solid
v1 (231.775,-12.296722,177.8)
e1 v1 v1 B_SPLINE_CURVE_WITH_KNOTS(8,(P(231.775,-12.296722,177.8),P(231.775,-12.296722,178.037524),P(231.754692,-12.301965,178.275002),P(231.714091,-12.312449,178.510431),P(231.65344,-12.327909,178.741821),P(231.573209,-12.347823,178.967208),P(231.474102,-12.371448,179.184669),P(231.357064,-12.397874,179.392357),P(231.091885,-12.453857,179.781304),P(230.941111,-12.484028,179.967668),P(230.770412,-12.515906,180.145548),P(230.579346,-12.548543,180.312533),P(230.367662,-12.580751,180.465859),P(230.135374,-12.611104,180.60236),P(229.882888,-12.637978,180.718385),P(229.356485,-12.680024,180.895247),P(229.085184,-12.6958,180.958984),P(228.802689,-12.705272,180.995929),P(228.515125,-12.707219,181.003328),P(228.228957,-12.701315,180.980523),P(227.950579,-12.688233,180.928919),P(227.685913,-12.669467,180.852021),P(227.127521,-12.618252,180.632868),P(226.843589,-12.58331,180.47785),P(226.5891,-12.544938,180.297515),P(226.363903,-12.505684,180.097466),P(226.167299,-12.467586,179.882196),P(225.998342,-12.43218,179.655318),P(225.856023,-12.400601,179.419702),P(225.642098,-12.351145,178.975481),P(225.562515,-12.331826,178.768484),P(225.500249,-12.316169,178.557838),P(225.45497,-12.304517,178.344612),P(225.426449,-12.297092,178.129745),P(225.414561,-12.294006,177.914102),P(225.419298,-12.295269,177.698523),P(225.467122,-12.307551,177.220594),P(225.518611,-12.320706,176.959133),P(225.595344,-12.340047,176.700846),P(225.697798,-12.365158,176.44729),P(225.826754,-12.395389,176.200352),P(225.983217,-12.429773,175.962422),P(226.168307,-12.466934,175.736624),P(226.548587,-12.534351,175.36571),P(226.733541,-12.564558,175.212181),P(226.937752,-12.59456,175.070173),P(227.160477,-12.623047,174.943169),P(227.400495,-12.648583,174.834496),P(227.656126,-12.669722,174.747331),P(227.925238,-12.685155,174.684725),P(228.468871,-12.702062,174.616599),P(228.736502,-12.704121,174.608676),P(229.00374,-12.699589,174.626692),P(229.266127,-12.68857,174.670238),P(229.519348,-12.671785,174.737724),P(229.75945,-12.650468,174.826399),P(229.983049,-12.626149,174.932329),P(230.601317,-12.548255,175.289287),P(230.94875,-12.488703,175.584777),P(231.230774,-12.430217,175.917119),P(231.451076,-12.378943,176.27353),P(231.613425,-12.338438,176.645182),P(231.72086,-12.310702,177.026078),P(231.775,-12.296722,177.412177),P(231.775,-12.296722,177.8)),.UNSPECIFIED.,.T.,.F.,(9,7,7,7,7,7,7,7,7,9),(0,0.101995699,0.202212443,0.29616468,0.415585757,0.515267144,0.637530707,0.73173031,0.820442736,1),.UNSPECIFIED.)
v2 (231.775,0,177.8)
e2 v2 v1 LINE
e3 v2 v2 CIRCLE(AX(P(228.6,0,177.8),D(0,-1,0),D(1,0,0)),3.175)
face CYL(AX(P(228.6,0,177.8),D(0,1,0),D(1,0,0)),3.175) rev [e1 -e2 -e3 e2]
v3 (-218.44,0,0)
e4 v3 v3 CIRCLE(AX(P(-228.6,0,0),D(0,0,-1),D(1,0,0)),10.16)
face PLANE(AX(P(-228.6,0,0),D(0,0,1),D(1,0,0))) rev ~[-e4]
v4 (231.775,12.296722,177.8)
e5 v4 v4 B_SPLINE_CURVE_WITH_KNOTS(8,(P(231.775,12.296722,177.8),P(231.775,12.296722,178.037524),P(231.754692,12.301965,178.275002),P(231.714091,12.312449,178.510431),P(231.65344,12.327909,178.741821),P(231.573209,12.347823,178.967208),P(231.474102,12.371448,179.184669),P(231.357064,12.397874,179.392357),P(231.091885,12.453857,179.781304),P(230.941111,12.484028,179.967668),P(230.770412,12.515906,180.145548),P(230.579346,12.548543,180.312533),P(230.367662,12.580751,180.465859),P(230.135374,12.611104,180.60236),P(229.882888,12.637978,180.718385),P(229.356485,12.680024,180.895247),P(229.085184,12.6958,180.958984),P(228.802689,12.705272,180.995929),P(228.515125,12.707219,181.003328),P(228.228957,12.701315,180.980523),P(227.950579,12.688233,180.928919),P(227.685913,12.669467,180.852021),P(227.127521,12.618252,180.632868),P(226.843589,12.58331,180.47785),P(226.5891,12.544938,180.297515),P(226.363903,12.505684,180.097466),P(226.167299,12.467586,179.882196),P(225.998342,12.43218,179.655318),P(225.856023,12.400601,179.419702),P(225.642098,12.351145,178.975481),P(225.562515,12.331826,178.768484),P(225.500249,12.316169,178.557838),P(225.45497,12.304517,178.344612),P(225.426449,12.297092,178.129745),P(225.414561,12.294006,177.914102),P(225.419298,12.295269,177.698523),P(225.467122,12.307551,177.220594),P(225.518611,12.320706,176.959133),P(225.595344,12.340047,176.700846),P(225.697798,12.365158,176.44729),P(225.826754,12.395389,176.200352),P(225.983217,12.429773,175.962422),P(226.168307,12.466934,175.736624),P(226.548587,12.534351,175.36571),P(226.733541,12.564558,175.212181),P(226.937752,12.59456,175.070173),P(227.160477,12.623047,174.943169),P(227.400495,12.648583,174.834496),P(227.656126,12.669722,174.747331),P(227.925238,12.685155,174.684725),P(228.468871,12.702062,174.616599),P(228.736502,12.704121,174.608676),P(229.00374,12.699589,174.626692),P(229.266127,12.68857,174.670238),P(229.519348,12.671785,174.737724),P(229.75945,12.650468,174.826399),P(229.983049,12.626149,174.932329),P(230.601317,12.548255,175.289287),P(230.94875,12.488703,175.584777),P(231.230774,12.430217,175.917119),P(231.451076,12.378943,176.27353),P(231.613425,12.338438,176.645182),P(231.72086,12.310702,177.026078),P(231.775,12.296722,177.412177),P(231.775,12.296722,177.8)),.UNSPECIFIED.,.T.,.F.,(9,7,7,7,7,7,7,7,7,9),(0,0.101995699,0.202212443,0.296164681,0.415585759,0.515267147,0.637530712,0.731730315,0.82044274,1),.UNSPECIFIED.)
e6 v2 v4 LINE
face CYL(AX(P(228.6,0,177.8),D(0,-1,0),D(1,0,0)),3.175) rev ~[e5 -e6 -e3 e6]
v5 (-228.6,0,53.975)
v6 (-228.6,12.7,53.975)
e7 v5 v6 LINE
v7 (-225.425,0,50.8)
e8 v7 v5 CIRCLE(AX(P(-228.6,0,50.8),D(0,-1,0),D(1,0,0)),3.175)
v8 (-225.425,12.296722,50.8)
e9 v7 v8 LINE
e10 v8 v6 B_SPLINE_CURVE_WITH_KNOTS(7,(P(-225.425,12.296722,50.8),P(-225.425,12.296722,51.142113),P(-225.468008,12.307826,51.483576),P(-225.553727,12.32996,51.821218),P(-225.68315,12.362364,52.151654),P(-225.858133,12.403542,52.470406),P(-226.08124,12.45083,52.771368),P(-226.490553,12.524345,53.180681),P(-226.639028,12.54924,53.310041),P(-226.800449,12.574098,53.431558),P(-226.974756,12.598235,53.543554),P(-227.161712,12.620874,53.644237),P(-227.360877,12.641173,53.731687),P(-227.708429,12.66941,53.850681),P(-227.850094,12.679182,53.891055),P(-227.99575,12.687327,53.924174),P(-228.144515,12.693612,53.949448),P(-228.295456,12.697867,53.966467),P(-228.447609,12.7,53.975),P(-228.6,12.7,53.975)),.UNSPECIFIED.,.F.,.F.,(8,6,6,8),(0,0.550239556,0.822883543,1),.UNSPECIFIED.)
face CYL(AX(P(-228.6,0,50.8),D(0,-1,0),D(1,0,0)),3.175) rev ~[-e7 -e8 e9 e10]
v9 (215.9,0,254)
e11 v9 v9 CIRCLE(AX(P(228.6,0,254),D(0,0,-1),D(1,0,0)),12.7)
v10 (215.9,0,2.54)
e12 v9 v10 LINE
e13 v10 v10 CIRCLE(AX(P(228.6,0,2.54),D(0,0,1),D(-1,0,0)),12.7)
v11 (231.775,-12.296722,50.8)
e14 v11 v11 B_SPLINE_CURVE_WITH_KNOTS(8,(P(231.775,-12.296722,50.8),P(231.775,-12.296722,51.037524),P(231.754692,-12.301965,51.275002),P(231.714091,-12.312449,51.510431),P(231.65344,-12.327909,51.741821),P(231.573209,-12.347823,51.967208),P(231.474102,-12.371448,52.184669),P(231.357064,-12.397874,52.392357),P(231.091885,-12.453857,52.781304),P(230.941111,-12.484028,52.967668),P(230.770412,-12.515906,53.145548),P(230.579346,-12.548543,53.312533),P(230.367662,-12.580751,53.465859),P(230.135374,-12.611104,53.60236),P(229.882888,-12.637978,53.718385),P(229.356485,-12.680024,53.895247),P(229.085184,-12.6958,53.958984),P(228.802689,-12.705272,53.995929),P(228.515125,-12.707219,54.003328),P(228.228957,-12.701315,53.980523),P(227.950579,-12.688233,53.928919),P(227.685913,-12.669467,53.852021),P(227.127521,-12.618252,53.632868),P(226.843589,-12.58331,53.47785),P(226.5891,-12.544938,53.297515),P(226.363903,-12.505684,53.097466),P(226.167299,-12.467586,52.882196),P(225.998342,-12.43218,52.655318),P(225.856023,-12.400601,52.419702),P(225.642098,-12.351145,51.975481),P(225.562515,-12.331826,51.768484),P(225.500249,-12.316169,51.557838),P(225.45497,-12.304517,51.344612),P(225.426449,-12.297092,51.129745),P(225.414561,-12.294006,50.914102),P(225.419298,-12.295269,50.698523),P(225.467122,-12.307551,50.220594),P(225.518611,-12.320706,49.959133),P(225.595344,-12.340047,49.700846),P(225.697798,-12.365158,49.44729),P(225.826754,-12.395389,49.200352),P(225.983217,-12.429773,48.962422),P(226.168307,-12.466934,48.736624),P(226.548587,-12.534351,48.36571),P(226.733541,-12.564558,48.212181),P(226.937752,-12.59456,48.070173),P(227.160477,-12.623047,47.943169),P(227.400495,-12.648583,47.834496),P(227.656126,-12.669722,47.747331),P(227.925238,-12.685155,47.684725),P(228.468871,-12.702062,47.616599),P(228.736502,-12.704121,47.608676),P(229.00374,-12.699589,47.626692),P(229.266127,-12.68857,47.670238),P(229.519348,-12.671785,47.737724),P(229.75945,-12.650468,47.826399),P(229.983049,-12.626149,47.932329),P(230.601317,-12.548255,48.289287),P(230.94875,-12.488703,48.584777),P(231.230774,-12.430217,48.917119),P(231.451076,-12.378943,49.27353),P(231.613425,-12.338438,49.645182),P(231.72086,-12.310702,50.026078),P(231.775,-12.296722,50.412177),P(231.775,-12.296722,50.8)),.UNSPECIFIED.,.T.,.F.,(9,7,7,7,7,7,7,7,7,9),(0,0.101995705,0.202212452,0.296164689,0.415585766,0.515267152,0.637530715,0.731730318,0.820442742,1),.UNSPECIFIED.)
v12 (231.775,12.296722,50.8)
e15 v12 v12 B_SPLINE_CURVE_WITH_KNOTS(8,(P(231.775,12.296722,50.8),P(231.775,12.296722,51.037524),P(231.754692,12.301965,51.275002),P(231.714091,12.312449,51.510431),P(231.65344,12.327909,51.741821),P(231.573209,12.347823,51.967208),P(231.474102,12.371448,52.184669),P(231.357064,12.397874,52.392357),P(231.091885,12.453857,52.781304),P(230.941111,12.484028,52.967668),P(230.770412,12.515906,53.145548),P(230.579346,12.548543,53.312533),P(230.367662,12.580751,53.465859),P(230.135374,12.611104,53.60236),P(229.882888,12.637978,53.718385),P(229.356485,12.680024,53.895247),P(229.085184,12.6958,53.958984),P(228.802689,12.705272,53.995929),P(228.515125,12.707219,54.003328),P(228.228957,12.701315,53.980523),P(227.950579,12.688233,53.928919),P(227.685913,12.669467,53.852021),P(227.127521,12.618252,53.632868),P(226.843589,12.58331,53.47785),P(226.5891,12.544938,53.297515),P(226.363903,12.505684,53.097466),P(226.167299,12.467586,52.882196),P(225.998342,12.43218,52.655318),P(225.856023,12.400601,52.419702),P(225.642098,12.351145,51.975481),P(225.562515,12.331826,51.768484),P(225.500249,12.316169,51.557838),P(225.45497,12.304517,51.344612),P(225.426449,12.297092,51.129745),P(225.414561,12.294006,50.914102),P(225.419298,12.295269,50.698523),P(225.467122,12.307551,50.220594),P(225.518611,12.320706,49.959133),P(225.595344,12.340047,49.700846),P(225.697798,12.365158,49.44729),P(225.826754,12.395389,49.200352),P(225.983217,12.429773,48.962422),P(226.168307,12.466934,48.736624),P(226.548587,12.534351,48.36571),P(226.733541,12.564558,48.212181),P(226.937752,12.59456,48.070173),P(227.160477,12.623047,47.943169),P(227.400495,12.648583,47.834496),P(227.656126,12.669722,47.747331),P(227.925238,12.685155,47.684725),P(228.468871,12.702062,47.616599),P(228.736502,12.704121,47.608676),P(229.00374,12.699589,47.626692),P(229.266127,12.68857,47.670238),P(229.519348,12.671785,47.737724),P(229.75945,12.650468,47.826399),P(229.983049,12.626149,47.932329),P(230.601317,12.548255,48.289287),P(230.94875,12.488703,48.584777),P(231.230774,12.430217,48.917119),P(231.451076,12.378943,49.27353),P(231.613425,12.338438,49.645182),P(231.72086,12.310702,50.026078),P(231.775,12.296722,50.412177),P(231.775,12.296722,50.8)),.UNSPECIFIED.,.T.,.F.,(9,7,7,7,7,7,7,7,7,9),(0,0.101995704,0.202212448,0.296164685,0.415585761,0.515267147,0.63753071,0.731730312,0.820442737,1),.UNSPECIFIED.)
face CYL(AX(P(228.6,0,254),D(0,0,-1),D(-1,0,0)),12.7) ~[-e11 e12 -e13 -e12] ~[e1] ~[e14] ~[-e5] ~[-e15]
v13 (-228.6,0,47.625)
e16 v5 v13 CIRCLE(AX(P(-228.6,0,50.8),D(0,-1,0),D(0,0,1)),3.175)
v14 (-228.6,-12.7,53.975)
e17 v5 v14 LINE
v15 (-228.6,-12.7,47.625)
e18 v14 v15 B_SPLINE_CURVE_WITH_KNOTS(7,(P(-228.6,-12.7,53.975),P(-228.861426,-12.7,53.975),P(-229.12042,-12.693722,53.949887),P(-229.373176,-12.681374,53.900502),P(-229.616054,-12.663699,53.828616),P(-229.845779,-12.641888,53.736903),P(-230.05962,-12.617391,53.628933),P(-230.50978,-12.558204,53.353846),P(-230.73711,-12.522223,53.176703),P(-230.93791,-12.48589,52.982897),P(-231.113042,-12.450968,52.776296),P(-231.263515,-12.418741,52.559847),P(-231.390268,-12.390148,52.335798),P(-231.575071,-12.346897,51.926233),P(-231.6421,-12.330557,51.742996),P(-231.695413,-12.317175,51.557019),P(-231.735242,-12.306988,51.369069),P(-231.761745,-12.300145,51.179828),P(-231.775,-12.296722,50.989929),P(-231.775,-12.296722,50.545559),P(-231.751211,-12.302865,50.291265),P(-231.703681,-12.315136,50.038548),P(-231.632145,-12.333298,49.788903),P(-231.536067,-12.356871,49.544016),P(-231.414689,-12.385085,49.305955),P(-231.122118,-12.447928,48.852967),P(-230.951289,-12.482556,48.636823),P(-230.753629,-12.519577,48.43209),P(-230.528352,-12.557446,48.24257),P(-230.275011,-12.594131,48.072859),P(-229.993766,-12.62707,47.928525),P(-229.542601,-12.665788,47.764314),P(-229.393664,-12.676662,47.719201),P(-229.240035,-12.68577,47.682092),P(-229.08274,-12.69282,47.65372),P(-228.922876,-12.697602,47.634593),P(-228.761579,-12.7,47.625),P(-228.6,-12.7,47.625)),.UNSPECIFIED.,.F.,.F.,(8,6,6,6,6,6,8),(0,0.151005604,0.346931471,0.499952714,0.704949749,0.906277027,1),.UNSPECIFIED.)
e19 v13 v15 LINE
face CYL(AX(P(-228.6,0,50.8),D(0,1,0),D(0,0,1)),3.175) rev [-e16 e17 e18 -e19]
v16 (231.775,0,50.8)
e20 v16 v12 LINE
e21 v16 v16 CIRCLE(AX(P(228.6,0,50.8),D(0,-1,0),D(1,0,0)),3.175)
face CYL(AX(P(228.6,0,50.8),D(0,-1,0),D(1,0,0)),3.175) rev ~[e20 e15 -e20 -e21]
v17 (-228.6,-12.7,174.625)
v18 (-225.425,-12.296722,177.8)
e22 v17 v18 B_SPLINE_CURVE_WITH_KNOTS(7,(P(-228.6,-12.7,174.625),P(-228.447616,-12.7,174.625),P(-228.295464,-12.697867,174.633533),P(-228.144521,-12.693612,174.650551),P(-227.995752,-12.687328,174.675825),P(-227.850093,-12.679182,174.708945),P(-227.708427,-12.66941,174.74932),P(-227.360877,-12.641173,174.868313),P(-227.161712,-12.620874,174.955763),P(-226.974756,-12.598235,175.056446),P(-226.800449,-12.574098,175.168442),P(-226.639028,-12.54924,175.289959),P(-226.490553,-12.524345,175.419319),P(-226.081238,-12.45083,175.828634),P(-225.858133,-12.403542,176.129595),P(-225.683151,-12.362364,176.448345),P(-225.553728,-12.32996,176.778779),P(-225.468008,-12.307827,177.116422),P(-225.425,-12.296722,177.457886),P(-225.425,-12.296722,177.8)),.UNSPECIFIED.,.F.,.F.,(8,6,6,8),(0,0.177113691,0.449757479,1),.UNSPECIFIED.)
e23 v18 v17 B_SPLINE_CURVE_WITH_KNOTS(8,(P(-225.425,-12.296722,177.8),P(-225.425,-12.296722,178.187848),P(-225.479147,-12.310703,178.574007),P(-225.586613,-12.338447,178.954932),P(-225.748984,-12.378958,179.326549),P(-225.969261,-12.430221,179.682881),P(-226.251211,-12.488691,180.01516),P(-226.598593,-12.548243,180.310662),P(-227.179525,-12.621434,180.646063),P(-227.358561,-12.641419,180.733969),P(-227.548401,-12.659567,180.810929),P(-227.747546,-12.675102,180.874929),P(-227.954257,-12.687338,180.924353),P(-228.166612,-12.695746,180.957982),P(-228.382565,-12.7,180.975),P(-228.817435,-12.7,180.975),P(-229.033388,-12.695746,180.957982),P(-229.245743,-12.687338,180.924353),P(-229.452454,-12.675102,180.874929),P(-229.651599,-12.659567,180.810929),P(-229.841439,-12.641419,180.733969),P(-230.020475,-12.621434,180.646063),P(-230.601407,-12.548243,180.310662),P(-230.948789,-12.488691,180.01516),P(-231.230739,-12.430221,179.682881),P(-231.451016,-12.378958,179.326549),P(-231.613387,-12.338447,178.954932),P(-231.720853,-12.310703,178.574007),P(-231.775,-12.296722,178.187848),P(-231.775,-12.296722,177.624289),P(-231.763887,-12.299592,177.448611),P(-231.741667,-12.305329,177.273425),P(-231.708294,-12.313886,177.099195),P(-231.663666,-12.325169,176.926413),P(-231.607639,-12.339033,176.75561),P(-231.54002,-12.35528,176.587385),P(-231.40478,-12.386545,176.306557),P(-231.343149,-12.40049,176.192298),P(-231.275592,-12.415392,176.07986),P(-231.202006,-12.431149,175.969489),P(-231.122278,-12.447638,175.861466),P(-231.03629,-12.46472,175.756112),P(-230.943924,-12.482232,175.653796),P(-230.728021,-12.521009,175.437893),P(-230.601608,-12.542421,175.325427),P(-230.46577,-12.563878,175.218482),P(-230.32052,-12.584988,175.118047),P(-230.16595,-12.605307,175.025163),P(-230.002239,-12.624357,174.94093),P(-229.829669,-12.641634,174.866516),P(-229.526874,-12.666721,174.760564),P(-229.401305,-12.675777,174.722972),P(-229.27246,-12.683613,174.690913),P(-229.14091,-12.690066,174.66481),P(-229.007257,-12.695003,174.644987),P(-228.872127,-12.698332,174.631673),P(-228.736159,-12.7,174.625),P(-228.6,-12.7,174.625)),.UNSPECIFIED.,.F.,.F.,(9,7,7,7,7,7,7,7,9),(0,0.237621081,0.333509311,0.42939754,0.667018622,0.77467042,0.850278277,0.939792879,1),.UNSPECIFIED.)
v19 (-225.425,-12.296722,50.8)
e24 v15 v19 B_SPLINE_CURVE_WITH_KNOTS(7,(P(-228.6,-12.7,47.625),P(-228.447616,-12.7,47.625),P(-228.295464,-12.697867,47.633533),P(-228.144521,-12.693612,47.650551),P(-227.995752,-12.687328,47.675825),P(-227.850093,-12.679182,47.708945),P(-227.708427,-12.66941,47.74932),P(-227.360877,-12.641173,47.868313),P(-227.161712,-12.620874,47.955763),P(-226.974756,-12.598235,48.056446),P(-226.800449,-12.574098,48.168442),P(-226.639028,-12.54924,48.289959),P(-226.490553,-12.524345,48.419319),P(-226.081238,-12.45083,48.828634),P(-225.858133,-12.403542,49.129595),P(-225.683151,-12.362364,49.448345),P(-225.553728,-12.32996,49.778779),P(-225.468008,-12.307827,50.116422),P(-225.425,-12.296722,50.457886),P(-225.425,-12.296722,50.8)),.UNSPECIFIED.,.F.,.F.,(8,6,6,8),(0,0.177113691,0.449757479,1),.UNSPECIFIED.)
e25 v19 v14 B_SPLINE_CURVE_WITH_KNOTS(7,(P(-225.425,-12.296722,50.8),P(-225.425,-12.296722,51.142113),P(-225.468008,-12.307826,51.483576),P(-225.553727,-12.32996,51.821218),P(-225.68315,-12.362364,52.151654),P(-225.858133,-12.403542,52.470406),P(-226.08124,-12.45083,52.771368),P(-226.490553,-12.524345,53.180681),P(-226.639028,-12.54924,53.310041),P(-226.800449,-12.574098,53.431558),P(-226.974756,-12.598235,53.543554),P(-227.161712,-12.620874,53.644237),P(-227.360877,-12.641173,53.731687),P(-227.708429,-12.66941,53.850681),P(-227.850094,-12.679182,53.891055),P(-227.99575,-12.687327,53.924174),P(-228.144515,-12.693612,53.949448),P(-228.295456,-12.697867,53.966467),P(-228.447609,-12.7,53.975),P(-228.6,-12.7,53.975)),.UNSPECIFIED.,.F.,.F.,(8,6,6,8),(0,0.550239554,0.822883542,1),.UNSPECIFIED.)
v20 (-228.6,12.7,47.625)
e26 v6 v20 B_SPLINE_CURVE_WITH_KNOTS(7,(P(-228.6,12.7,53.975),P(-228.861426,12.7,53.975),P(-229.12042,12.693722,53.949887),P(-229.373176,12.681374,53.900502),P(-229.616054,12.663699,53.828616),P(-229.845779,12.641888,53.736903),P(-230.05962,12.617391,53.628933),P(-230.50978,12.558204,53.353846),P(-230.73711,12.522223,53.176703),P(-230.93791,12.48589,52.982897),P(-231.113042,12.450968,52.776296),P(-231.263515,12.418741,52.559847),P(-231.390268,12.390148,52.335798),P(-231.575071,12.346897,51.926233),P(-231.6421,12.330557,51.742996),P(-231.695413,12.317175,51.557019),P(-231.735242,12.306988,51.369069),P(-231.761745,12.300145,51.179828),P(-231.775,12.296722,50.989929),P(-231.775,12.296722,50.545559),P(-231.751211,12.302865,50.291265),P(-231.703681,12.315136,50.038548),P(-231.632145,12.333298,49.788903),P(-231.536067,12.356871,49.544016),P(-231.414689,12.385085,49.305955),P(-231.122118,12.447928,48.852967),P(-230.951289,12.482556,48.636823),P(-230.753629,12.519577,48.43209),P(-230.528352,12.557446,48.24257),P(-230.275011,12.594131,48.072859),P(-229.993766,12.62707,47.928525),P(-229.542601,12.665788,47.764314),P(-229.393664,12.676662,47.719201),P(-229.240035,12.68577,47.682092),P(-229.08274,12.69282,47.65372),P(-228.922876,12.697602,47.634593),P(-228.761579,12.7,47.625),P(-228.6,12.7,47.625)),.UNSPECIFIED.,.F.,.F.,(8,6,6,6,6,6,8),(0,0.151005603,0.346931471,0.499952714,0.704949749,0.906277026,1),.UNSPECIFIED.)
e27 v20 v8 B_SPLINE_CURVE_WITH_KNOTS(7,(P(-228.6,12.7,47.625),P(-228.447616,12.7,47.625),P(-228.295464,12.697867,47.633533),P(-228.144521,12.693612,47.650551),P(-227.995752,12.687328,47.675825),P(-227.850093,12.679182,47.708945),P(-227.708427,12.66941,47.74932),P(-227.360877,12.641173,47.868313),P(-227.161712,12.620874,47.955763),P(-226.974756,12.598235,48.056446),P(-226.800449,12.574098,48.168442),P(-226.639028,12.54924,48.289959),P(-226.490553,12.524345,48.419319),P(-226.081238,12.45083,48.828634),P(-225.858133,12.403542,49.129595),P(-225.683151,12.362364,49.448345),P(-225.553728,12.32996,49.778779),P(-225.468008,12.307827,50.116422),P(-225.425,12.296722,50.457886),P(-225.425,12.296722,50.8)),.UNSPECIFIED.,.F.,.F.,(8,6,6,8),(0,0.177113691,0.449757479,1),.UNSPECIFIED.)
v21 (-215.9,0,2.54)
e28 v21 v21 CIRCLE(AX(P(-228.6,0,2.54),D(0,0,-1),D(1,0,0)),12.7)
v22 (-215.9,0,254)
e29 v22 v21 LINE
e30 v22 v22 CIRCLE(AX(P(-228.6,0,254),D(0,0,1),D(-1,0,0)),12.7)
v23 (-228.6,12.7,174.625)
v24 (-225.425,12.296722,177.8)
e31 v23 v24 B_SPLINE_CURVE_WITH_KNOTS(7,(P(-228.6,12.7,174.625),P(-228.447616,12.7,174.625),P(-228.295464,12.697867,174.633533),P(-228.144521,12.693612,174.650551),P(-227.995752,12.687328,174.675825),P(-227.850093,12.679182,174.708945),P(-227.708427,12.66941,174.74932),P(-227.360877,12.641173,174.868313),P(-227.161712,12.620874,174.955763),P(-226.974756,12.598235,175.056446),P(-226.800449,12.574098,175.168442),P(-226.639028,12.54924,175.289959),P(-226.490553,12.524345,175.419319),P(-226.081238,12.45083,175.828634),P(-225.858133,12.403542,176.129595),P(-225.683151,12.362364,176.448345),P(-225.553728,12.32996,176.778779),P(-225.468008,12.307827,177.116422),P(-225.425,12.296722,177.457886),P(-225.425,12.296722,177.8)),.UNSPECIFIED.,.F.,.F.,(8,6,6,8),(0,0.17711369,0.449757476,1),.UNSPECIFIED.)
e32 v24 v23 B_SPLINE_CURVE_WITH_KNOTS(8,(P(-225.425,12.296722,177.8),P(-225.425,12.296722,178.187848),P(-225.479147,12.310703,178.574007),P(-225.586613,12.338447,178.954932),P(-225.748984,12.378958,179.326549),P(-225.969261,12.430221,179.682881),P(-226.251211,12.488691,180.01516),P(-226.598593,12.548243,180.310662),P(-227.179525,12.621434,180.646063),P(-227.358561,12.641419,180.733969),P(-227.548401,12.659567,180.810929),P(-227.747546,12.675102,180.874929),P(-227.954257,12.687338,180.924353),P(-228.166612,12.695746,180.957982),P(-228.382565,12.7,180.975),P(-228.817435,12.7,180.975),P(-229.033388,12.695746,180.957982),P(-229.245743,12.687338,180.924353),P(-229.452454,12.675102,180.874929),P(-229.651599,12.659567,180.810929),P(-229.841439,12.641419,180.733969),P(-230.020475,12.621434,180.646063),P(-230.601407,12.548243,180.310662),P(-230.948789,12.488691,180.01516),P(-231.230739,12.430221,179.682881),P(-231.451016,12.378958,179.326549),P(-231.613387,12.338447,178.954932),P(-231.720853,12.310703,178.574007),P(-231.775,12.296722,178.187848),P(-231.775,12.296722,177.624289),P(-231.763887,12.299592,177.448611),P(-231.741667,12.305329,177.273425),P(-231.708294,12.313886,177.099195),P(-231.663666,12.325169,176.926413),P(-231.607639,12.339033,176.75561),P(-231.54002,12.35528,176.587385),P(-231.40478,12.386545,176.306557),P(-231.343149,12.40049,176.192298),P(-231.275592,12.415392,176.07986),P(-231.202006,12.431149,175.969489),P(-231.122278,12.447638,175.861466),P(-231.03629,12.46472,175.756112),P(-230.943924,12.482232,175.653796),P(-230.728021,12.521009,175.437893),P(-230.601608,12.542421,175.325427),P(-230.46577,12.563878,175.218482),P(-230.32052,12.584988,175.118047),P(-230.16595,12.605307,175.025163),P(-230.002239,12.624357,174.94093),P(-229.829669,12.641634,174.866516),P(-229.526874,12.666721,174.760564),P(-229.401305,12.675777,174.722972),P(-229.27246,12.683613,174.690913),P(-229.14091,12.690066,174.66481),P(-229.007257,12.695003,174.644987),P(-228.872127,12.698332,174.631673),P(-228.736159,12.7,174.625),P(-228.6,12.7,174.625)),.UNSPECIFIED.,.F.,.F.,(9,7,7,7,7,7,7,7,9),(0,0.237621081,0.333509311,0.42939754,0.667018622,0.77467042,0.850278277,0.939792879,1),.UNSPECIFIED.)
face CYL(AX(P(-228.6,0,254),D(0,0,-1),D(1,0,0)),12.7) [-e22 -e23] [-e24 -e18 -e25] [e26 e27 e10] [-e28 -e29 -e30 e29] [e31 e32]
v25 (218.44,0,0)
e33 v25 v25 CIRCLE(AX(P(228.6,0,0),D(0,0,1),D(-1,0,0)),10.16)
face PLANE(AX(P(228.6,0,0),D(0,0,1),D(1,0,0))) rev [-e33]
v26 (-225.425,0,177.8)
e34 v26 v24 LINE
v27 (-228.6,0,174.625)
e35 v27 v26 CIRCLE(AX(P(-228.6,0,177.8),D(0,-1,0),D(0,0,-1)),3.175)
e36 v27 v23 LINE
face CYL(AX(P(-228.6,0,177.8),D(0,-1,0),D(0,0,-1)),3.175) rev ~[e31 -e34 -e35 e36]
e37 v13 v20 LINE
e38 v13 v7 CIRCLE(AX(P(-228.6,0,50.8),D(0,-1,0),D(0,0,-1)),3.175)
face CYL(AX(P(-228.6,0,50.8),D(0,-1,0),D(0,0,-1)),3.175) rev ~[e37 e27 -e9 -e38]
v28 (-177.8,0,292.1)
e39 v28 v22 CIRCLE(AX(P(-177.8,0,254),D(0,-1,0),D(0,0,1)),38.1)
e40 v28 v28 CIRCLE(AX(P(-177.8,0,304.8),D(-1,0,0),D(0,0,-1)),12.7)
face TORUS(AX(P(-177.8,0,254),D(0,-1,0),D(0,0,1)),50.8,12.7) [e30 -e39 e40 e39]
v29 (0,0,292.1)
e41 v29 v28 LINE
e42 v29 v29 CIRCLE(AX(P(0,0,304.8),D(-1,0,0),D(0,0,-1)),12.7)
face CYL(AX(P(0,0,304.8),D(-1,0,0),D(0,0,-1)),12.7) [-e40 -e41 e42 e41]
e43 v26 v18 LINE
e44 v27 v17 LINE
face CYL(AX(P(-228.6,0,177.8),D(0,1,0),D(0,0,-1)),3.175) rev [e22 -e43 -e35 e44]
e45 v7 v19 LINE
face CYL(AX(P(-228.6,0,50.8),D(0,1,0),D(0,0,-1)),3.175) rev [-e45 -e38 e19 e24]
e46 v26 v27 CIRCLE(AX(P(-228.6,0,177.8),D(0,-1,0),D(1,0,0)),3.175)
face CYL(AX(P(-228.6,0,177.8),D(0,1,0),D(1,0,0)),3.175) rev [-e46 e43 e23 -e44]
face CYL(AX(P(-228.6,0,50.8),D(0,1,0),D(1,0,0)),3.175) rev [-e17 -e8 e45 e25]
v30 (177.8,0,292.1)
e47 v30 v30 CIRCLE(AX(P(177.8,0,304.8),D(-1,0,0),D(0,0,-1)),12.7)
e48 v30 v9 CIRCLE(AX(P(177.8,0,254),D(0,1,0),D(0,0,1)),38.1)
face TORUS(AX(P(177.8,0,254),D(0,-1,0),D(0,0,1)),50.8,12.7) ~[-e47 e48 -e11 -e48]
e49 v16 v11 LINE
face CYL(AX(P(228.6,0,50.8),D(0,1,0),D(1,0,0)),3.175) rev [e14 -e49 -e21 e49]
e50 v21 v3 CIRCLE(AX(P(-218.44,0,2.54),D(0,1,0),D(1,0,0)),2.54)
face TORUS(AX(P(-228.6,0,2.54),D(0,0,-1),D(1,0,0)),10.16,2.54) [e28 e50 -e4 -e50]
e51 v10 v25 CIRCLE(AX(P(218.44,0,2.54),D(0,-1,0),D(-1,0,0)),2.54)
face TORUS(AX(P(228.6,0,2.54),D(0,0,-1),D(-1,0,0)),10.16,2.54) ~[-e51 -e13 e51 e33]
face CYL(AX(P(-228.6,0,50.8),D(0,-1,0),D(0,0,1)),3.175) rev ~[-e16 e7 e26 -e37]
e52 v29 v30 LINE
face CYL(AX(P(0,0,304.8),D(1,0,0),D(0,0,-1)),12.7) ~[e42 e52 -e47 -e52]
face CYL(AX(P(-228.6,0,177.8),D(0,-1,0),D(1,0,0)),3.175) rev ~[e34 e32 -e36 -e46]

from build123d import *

# Parameters (mm, degrees)
F0_R          = 12.7
F4_R          = 3.175
F5_DEPTH      = 25.4
F5_DEPTH_BACK = 25.4
F6_R          = 2.54


with BuildPart() as f2:
    # F2: sweep along a path in F1
    with BuildLine(Plane.XZ) as f2_path:
        Line((0, 304.8), (-177.8, 304.8))
        ThreePointArc((-177.8, 304.8), (-213.7210244843, 289.9210244843), (-228.6, 254))
        Line((-228.6, 254), (-228.6, 0))
    # F0 (on Top) → F2 (sweep)
    with BuildSketch(Plane.XY):
        with Locations((-228.6, 0)):
            Circle(F0_R)
    sweep(path=f2_path.line)

    # F3: F2 across plane


with BuildPart() as f2_1:
    add(f2.part)
    add(f2.part.mirror(Plane.YZ))

    # F4 (on Front) → F5 (cut, two sides)
    with BuildSketch(Plane.XZ) as f5_sk:
        with BuildLine():
            ThreePointArc((-228.6, 53.975), (-231.775, 50.8), (-228.6, 47.625))
            Line((-228.6, 47.625), (-228.6, 50.8))
            Line((-228.6, 50.8), (-228.6, 53.975))
        make_face()
        with BuildLine():
            ThreePointArc((-225.425, 177.8), (-230.8450640303, 180.0450640303), (-228.6, 174.625))
            ThreePointArc((-228.6, 174.625), (-226.3549359697, 175.5549359697), (-225.425, 177.8))
        make_face()
        with BuildLine():
            Line((-228.6, 50.8), (-228.6, 47.625))
            ThreePointArc((-228.6, 47.625), (-226.3549359697, 48.5549359697), (-225.425, 50.8))
            ThreePointArc((-225.425, 50.8), (-226.3549359697, 53.0450640303), (-228.6, 53.975))
            Line((-228.6, 53.975), (-228.6, 50.8))
        make_face()
        with Locations((228.6, 177.8)):
            Circle(F4_R)
        with Locations((228.6, 50.8)):
            Circle(F4_R)
    extrude(amount=F5_DEPTH, mode=Mode.SUBTRACT)
    extrude(f5_sk.sketch, amount=-F5_DEPTH_BACK, mode=Mode.SUBTRACT)

    # F6
    f6_edges = [f2_1.edges().sort_by_distance(p)[0] for p in [
        (241.3, 0, 0),
        (-241.3, 0, 0),
    ]]
    fillet(f6_edges, radius=F6_R)


solid = f2_1.part
